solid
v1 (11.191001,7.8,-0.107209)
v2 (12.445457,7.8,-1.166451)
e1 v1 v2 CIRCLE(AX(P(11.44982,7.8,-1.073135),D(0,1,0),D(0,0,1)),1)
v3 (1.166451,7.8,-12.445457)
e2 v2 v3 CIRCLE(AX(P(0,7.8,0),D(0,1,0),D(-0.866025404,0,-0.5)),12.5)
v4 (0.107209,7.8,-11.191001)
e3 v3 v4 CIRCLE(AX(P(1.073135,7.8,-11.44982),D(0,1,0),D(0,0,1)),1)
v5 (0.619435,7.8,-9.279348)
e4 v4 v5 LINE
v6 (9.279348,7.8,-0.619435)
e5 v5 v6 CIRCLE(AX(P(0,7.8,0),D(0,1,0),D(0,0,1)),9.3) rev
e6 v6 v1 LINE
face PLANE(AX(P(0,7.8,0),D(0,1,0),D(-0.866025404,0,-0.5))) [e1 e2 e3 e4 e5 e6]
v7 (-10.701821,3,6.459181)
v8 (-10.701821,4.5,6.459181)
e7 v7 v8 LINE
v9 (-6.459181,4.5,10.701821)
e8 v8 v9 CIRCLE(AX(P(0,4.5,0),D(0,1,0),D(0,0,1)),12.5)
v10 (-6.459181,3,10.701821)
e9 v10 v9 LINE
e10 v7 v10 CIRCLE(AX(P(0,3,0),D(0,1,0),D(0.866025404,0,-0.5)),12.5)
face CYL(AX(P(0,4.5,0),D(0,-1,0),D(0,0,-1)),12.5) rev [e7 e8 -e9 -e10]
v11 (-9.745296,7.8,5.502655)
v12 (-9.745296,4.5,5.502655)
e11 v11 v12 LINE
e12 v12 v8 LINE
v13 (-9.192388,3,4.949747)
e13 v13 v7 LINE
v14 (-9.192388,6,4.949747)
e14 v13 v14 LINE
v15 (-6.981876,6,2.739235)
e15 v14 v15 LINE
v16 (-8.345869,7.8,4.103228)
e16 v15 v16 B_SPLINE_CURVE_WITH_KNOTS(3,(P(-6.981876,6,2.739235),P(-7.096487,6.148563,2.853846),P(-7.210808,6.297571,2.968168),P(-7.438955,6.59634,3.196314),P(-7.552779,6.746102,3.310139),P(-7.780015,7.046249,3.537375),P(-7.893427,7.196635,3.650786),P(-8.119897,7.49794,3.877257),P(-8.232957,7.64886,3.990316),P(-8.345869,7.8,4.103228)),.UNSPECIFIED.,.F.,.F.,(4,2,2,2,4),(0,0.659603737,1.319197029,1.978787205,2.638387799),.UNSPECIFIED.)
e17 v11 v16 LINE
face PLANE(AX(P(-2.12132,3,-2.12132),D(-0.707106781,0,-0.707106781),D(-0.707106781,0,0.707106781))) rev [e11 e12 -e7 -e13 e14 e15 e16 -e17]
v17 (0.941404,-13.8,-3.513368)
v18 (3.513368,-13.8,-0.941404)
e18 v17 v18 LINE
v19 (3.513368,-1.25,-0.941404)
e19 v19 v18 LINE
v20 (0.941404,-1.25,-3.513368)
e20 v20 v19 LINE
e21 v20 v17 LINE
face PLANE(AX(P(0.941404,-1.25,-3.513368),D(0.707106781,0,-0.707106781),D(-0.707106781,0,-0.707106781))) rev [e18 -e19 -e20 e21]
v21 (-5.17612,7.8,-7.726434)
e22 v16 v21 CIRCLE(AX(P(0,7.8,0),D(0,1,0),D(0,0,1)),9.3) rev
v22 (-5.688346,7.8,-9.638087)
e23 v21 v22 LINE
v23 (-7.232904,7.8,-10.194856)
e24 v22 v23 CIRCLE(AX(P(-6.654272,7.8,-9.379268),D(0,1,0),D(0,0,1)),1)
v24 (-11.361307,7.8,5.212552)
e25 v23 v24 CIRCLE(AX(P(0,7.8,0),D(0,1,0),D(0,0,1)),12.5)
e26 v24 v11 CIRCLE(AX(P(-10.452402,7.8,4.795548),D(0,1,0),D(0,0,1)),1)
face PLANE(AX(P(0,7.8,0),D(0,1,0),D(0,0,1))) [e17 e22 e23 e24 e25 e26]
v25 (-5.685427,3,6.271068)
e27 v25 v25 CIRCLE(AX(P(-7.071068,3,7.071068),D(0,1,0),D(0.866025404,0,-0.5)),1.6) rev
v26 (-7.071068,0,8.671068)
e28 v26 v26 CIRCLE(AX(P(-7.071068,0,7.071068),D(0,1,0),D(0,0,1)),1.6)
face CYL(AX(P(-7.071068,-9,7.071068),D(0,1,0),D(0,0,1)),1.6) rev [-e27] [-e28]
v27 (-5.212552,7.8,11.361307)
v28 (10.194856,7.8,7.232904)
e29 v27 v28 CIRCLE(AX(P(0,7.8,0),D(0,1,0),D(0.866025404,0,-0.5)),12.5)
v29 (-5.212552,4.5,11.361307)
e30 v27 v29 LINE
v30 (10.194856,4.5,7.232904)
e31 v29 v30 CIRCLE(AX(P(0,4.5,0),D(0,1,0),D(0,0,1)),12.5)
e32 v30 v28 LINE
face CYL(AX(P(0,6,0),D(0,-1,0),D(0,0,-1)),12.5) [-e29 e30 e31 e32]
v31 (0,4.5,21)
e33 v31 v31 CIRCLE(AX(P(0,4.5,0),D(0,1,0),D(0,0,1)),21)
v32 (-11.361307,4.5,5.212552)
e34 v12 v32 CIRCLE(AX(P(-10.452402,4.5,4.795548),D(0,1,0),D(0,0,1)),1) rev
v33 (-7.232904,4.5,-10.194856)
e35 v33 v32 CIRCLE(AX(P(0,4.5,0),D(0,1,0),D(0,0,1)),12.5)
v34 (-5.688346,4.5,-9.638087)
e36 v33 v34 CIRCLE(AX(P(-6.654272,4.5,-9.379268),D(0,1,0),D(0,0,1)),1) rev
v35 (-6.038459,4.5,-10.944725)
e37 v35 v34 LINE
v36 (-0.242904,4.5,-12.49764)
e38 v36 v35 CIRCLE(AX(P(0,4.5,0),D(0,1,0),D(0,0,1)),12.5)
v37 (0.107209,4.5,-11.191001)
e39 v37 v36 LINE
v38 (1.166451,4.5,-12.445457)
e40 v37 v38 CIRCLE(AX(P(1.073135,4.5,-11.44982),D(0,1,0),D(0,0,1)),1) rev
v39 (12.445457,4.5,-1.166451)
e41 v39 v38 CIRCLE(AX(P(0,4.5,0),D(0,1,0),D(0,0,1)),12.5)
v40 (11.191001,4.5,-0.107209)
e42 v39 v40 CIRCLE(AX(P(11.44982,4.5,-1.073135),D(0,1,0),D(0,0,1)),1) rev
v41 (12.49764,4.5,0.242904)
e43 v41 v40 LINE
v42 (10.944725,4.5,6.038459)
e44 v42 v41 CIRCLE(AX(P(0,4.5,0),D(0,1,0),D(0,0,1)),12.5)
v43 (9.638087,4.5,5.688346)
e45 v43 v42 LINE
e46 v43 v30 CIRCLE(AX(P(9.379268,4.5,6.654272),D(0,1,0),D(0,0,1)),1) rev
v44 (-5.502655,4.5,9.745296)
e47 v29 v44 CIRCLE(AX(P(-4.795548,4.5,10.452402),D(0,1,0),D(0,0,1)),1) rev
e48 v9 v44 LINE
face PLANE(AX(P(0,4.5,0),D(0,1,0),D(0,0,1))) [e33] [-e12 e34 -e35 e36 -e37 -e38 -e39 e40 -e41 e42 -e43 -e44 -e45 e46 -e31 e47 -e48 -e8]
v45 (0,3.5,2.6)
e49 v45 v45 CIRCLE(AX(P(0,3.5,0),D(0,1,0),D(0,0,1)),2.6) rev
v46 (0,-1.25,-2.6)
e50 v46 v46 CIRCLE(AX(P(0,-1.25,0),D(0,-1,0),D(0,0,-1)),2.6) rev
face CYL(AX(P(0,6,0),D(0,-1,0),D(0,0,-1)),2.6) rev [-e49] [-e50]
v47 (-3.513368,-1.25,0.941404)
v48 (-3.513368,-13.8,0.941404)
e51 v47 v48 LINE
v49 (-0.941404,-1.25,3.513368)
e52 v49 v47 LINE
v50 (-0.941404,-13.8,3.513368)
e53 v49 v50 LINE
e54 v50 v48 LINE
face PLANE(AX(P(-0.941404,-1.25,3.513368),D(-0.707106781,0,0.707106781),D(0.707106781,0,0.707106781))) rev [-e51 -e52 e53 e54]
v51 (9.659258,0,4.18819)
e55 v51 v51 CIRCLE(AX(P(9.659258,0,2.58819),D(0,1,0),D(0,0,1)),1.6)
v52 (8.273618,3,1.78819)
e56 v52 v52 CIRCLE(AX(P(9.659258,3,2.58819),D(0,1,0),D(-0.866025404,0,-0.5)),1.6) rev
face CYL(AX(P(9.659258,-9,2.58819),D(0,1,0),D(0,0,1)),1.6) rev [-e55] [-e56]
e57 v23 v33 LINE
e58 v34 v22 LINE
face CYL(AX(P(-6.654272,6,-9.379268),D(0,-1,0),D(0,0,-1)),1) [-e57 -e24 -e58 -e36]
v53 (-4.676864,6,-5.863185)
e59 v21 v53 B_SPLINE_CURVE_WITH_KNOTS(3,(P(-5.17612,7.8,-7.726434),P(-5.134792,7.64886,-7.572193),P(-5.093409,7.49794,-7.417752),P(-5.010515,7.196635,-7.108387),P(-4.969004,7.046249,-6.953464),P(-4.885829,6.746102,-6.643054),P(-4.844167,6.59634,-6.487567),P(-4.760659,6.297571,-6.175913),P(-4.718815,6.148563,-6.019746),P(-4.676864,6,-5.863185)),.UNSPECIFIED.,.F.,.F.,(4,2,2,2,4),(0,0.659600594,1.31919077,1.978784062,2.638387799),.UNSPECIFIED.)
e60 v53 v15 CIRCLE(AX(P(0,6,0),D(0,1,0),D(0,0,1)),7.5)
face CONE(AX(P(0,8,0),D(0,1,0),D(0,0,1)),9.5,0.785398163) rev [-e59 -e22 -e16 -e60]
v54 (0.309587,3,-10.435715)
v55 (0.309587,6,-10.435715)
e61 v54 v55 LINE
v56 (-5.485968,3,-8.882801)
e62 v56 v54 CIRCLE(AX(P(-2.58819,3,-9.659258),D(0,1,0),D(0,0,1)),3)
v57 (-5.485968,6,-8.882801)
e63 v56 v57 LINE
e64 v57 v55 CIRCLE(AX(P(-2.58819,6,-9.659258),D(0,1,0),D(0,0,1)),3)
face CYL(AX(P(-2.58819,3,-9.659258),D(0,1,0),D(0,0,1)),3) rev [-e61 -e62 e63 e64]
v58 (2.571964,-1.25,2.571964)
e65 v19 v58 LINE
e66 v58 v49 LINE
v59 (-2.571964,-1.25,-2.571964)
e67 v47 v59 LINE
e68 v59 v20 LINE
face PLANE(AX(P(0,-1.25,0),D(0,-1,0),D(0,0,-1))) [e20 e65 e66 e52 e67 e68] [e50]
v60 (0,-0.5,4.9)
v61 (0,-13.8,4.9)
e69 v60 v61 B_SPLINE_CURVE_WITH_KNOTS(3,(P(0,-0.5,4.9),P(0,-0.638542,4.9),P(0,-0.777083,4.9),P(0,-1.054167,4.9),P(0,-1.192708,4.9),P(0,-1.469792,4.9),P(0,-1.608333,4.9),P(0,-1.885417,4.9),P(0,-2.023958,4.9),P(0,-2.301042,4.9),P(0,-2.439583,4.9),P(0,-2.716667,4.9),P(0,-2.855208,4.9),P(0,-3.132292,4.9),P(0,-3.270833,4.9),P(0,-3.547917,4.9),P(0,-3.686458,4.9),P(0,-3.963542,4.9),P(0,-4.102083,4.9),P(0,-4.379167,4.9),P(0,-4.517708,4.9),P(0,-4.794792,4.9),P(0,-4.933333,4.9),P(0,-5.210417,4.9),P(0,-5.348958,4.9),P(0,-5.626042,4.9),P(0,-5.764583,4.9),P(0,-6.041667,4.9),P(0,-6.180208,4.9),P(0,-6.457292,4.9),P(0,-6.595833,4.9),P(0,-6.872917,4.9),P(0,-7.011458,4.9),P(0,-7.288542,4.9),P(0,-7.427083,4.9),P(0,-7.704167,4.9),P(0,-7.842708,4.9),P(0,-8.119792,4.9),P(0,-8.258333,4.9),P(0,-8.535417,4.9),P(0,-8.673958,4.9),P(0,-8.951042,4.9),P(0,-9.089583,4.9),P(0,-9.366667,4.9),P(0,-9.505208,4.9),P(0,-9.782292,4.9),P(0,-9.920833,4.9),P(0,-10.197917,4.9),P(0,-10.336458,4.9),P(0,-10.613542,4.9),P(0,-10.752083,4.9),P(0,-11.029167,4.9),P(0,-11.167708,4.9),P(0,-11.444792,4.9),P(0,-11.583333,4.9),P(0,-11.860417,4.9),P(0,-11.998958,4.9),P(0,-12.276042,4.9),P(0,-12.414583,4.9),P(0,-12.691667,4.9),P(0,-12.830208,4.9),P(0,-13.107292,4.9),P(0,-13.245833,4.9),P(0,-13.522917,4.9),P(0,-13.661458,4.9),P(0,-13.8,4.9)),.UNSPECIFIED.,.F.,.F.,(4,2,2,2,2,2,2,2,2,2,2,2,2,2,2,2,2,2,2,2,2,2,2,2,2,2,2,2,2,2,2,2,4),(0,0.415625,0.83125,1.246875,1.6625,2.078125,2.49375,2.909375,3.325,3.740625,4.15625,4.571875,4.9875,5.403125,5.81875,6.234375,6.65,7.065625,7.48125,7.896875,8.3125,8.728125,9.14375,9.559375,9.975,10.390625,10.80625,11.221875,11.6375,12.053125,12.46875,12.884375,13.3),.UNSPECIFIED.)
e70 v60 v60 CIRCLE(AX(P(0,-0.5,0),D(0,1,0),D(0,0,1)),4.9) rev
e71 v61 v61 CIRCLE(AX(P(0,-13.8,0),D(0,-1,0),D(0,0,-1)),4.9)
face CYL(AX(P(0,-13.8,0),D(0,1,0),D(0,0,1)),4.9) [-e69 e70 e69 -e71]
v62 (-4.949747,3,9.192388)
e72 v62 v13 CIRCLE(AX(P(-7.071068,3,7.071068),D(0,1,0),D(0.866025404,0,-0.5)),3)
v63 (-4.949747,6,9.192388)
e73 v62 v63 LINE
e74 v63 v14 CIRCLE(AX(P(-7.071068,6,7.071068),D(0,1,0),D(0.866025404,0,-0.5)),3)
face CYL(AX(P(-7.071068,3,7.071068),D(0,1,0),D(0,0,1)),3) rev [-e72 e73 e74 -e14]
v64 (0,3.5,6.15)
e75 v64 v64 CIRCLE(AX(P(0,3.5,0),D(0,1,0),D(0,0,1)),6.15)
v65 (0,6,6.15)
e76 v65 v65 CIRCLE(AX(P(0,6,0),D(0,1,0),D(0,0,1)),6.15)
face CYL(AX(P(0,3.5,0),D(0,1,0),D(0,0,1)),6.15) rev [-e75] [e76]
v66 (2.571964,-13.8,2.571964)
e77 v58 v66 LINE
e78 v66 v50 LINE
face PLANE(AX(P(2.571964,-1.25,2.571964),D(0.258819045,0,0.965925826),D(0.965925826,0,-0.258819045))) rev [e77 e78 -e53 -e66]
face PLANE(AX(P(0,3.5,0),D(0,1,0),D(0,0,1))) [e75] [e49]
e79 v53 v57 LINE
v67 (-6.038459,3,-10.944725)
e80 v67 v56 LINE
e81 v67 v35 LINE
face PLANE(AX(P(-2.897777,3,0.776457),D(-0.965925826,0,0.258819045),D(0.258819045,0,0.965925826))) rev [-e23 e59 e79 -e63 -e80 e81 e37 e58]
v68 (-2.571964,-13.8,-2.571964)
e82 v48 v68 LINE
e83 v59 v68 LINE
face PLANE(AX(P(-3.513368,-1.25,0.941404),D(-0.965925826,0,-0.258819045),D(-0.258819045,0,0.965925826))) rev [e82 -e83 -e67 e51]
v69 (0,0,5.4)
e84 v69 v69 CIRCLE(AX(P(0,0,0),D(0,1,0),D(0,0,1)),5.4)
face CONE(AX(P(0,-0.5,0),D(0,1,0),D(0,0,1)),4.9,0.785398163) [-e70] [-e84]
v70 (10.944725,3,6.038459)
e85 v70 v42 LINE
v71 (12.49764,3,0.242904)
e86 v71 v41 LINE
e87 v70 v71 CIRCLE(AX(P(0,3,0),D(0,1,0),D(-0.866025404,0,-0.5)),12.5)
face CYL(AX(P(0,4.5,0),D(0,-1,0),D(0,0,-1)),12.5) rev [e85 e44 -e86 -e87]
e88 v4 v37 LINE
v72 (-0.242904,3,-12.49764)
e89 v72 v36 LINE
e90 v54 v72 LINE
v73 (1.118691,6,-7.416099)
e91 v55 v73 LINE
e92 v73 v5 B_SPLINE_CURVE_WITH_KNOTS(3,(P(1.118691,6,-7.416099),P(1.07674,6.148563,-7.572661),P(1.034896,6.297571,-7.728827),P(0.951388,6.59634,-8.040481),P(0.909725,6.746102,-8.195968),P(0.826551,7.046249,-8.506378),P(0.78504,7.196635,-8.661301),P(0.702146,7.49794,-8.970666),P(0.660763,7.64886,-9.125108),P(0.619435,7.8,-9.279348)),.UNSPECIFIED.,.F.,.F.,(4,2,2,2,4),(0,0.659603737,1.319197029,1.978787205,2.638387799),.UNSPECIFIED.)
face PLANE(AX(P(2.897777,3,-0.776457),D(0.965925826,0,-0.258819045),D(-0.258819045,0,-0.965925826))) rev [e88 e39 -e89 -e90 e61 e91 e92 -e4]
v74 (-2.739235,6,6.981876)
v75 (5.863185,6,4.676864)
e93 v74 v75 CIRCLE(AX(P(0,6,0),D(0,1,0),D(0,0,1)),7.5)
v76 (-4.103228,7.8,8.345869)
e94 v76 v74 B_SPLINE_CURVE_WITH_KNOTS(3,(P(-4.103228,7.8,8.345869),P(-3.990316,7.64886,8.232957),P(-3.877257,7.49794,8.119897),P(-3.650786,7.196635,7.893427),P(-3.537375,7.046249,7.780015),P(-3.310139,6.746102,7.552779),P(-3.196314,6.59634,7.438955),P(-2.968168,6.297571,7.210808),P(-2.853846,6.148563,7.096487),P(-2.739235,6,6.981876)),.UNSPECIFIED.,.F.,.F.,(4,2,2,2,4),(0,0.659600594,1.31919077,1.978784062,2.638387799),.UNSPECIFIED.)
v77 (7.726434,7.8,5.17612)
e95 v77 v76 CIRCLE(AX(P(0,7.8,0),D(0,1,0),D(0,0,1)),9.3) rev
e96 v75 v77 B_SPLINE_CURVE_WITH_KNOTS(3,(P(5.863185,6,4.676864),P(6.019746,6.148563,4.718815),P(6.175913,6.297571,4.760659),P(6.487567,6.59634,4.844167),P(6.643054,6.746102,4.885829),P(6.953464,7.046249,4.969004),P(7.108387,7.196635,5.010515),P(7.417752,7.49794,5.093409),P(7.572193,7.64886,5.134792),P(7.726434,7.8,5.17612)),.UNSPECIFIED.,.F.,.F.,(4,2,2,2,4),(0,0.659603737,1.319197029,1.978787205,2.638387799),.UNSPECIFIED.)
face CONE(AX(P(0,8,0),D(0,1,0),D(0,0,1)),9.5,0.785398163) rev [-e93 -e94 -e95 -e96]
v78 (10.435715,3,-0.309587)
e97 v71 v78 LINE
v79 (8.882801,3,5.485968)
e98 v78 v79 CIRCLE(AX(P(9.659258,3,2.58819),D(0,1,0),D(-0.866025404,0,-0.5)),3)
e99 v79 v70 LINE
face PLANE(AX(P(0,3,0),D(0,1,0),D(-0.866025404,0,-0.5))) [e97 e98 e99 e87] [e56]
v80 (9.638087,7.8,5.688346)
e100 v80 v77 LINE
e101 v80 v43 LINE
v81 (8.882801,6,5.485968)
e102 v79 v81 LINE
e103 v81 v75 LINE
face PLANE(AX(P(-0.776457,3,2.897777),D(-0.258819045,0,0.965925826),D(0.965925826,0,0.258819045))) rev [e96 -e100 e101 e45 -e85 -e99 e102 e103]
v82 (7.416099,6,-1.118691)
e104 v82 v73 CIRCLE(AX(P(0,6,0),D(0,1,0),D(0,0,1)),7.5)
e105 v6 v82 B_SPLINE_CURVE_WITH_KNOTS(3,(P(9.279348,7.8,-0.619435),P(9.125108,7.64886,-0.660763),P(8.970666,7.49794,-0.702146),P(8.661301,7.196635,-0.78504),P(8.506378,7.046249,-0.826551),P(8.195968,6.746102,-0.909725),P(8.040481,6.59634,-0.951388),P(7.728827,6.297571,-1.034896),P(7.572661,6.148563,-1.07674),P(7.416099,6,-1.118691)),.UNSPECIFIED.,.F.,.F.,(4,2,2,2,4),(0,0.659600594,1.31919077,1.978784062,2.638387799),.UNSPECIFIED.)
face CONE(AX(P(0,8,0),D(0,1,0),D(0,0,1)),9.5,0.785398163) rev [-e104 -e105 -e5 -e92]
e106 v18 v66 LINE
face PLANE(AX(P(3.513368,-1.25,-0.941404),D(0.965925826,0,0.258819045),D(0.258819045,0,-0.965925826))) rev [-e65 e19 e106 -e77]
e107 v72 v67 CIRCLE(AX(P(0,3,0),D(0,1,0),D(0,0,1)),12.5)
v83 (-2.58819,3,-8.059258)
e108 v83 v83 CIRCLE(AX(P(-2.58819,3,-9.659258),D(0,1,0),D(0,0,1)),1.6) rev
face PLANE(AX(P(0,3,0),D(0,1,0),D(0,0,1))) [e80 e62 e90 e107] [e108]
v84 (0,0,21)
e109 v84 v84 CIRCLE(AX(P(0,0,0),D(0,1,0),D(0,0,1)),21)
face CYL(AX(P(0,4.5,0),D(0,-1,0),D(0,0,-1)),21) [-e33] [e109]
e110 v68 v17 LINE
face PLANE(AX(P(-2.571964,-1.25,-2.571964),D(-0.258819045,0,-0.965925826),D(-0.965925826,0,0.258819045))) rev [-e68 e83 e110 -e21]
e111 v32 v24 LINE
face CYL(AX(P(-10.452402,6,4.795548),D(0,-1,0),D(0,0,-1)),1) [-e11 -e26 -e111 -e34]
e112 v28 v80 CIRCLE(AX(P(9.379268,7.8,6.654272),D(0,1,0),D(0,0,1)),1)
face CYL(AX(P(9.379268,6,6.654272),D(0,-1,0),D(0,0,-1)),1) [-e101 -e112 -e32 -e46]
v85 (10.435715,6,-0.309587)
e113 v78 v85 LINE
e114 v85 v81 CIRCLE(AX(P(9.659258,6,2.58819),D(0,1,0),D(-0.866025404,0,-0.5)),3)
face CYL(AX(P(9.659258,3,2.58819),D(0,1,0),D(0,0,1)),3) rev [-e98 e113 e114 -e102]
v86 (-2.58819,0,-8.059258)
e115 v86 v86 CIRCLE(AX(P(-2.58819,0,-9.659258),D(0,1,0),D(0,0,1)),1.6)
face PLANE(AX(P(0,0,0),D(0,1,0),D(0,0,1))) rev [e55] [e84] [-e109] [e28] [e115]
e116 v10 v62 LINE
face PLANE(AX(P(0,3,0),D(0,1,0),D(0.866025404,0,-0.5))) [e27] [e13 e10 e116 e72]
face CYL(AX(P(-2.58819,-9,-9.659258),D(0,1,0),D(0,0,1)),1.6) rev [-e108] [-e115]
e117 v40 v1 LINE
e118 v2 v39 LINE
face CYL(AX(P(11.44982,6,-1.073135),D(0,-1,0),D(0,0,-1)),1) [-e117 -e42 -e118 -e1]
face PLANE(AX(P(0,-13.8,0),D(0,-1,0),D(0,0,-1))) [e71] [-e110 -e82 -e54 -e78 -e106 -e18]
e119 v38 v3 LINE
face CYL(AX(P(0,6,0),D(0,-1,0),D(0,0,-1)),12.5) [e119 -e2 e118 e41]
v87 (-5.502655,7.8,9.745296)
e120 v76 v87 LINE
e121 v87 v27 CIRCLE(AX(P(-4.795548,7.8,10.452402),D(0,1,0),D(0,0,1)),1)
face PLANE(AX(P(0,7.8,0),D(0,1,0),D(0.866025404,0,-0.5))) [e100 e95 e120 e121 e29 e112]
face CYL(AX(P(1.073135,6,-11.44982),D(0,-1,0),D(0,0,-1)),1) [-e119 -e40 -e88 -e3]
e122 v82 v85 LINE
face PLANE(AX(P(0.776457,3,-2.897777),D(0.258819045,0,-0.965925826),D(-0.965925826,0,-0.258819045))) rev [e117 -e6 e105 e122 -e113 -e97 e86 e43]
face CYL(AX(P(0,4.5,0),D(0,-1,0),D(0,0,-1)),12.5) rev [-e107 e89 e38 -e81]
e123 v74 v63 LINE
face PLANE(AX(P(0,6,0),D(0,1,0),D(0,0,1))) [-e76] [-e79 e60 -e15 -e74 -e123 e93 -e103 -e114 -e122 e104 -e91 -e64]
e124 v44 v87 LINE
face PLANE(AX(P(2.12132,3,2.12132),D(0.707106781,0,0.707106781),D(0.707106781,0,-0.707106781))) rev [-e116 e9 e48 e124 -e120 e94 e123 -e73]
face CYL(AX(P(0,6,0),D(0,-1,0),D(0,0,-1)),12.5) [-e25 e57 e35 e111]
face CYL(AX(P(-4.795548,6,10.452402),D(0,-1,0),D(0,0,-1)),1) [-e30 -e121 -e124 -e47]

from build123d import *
from build123d.topology import SkipClean

# Parameters (mm, degrees)
SKETCH_1_R               = 4
SKETCH_1_R_2             = 2.625
EXTRUDE_1_DEPTH          = 6
SKETCH_2_R               = 12.5
SKETCH_2_R_2             = 2.6
EXTRUDE_2_DEPTH          = 6
SKETCH_3_R               = 1.6
CUT_EXTRUDE_1_DEPTH      = 15
SKETCH_6_R               = 1.6
CUT_EXTRUDE_5_DEPTH      = 3
PATTERN_CIRCULAR_1_COUNT = 3
EXTRUDE_START            = 13.8
SKETCH_4_R               = 4.9
SKETCH_4_R_2             = 2.6
EXTRUDE_3_DEPTH          = 13.8
SKETCH_7_R               = 6.15
CUT_EXTRUDE_7_DEPTH      = 2.5
CUT_EXTRUDE_8_DEPTH      = 12.55
SKETCH_10_R              = 21
SKETCH_10_R_2            = 12.5
EXTRUDE_4_DEPTH          = 4.5
EXTRUDE_5_DEPTH          = 1.8
PATTERN_CIRCULAR_2_COUNT = 3
FILLET_1_R               = 1
CHAMFER_1_SIZE           = 0.5
CHAMFER_2_SIZE           = 2


with BuildPart() as part:
    # 草图1 → 凸台-拉伸1 (new body)
    with BuildSketch(Plane(origin=(0, 0, 0), x_dir=(1, 0, 0), z_dir=(0, 1, 0))):
        with Locations(Location((0, 0, 0), (0, 0, 270))):
            Circle(SKETCH_1_R)
        with Locations(Location((0, 0, 0), (0, 0, 270))):
            Circle(SKETCH_1_R_2, mode=Mode.SUBTRACT)
    extrude(amount=EXTRUDE_1_DEPTH)

    # 草图2 → 凸台-拉伸2 (add)
    with BuildSketch(Plane(origin=(0, 0, 0), x_dir=(-1, 0, 0), z_dir=(0, -1, 0))):
        with Locations(Location((0, 0, 0), (0, 0, 90))):
            Circle(SKETCH_2_R)
        with Locations(Location((0, 0, 0), (0, 0, 90))):
            Circle(SKETCH_2_R_2, mode=Mode.SUBTRACT)
    extrude(amount=-EXTRUDE_2_DEPTH)

    # 草图3 → 切除-拉伸1 (cut)
    with BuildSketch(Plane(origin=(0, 6, 0), x_dir=(1, 0, 0), z_dir=(0, 1, 0))):
        with Locations(Location((-2.588190451, 9.659258263, 0), (0, 0, 270))):
            Circle(SKETCH_3_R)
    cut_extrude_1 = extrude(amount=-CUT_EXTRUDE_1_DEPTH, mode=Mode.SUBTRACT)

    # 草图6 → 切除-拉伸5 (cut)
    with BuildSketch(Plane(origin=(0, 6, 0), x_dir=(1, 0, 0), z_dir=(0, 1, 0))):
        with BuildLine():
            Line((-6.038458877, 10.944725414), (-5.48596793, 8.882801128))
            ThreePointArc((-5.48596793, 8.882801128), (-1.811733316, 6.761480784), (0.309587028, 10.435715398))
            Line((0.309587028, 10.435715398), (-0.24290392, 12.497639685))
            ThreePointArc((-0.24290392, 12.497639685), (-3.235238064, 12.074072829), (-6.038458877, 10.944725414))
        make_face()
        with Locations(Location((-2.588190451, 9.659258263, 0), (0, 0, 270))):
            Circle(SKETCH_6_R, mode=Mode.SUBTRACT)
    cut_extrude_5 = extrude(amount=-CUT_EXTRUDE_5_DEPTH, mode=Mode.SUBTRACT)

    # 阵列(圆周)1: 切除-拉伸1, 切除-拉伸5 ×3 about axis
    pattern_circular_1_axis = Axis((0, 0, 0), (0, 1, 0))
    add([cut_extrude_1.rotate(pattern_circular_1_axis, i * 360 / PATTERN_CIRCULAR_1_COUNT) for i in range(1, PATTERN_CIRCULAR_1_COUNT)], mode=Mode.SUBTRACT)
    add([cut_extrude_5.rotate(pattern_circular_1_axis, i * 360 / PATTERN_CIRCULAR_1_COUNT) for i in range(1, PATTERN_CIRCULAR_1_COUNT)], mode=Mode.SUBTRACT)

    # 草图4 → 凸台-拉伸3 (add)
    with BuildSketch(Plane(origin=(0, 0, 0), x_dir=(-1, 0, 0), z_dir=(0, -1, 0)).offset(EXTRUDE_START)):
        with Locations(Location((0, 0, 0), (0, 0, 270))):
            Circle(SKETCH_4_R)
        with Locations(Location((0, 0, 0), (0, 0, 90))):
            Circle(SKETCH_4_R_2, mode=Mode.SUBTRACT)
    extrude(amount=-EXTRUDE_3_DEPTH)

    # 草图7 → 切除-拉伸7 (cut)
    with BuildSketch(Plane(origin=(0, 6, 0), x_dir=(1, 0, 0), z_dir=(0, 1, 0))):
        with Locations(Location((0, 0, 0), (0, 0, 270))):
            Circle(SKETCH_7_R)
    extrude(amount=-CUT_EXTRUDE_7_DEPTH, mode=Mode.SUBTRACT)

    # 草图8 → 切除-拉伸8 (cut)
    with BuildSketch(Plane(origin=(0, -13.8, 0), x_dir=(-1, 0, 0), z_dir=(0, -1, 0))):
        Polygon((-2.57196423, -2.57196423), (0.941404246, -3.513368476), (3.513368476, -0.941404246), (2.57196423, 2.57196423), (-0.941404246, 3.513368476), (-3.513368476, 0.941404246), align=None)
    extrude(amount=-CUT_EXTRUDE_8_DEPTH, mode=Mode.SUBTRACT)

    # 草图10 → 凸台-拉伸4 (add)
    with BuildSketch(Plane(origin=(0, 0, 0), x_dir=(1, 0, 0), z_dir=(0, 1, 0))):
        with Locations(Location((0, 0, 0), (0, 0, 270))):
            Circle(SKETCH_10_R)
        Circle(SKETCH_10_R_2, mode=Mode.SUBTRACT)
    extrude(amount=EXTRUDE_4_DEPTH)

    # 草图11 → 凸台-拉伸5 (add)
    with BuildSketch(Plane(origin=(0, 6, 0), x_dir=(1, 0, 0), z_dir=(0, 1, 0))):
        with BuildLine():
            Line((-5.230740824, 7.930280602), (-6.038458877, 10.944725414))
            ThreePointArc((-6.038458877, 10.944725414), (-12.074072829, 3.235238064), (-10.701821494, -6.459180807))
            Line((-10.701821494, -6.459180807), (-8.495094736, -4.252454048))
            ThreePointArc((-8.495094736, -4.252454048), (-9.17629535, 2.458780928), (-5.230740824, 7.930280602))
        make_face()
    extrude_5 = extrude(amount=EXTRUDE_5_DEPTH)

    # 阵列(圆周)2: 凸台-拉伸5 ×3 about axis
    with SkipClean():  # the faces are left unmerged after this step: merging them gives an invalid solid
        pattern_circular_2_axis = Axis((0, 3.5, 0), (0, 1, 0))
        for i in range(1, PATTERN_CIRCULAR_2_COUNT):
            add(extrude_5.rotate(pattern_circular_2_axis, i * 360 / PATTERN_CIRCULAR_2_COUNT))

    # 圆角1
    fillet_1_edges = [part.edges().sort_by_distance(p)[0] for p in [
        (-10.701821494, 6.9, 6.459180807),
        (-6.459180807, 6.9, 10.701821494),
        (10.944725414, 6.9, 6.038458877),
        (12.497639685, 6.9, 0.24290392),
        (-0.24290392, 6.9, -12.497639685),
        (-6.038458877, 6.9, -10.944725414),
    ]]
    fillet(fillet_1_edges, radius=FILLET_1_R)

    # 倒角1
    chamfer_1_edges = [part.edges().sort_by_distance(p)[0] for p in [
        (0, 0, -4.9),
    ]]
    chamfer(chamfer_1_edges, length=CHAMFER_1_SIZE)

    # 倒角2
    # the kernel refuses this chamfer: 2 mm, written as the material it adds along each edge
    with BuildSketch(Plane(origin=(0, 6, 0), x_dir=(-0.46364396793112084, 0, -0.8860215973671781), z_dir=(-0.8860215973671781, 0, 0.46364396793112084))) as chamfer_2_piece_1_section:
        Polygon((9.5 - CHAMFER_2_SIZE, 0), (9.5, -CHAMFER_2_SIZE), (9.5, 0), align=None)
    chamfer_2_piece_1 = revolve(axis=Axis((0, 6, 0), (0, -1, 0)), revolution_arc=145.244994466, mode=Mode.PRIVATE)
    chamfer_2_piece_1 = split(chamfer_2_piece_1, bisect_by=Plane(origin=(4.843261848, 6.879467901, -1.80808044), z_dir=(0.2588190451025276, 0, -0.9659258262890666)), keep=Keep.TOP, mode=Mode.PRIVATE)
    chamfer_2_piece_1 = split(chamfer_2_piece_1, bisect_by=Plane(origin=(1.80808044, 6.879467901, -4.843261848), z_dir=(0.9659258262890712, 0, -0.2588190451025102)), keep=Keep.TOP, mode=Mode.PRIVATE)
    chamfer_2_piece_1 = split(chamfer_2_piece_1, bisect_by=Plane(origin=(5.954215348, 7.8, -5.954215348), z_dir=(0, -1, 0)), keep=Keep.TOP, mode=Mode.PRIVATE)
    add(chamfer_2_piece_1)
    with BuildSketch(Plane(origin=(0, 6, 0), x_dir=(0.9991391955872041, 0, 0.04148334414382066), z_dir=(0.04148334414382066, 0, -0.9991391955872041))) as chamfer_2_piece_2_section:
        Polygon((9.5 - CHAMFER_2_SIZE, 0), (9.5, -CHAMFER_2_SIZE), (9.5, 0), align=None)
    chamfer_2_piece_2 = revolve(axis=Axis((0, 6, 0), (0, -1, 0)), revolution_arc=145.244994466, mode=Mode.PRIVATE)
    chamfer_2_piece_2 = split(chamfer_2_piece_2, bisect_by=Plane(origin=(3.290347577, 6.879467901, 3.987474517), z_dir=(-0.25881904510253106, 0, 0.9659258262890655)), keep=Keep.TOP, mode=Mode.PRIVATE)
    chamfer_2_piece_2 = split(chamfer_2_piece_2, bisect_by=Plane(origin=(-0.855787331, 6.879467901, 5.098428018), z_dir=(0.7071067811865428, 0, 0.7071067811865523)), keep=Keep.TOP, mode=Mode.PRIVATE)
    chamfer_2_piece_2 = split(chamfer_2_piece_2, bisect_by=Plane(origin=(2.179394077, 7.8, 8.133609425), z_dir=(0, -1, 0)), keep=Keep.TOP, mode=Mode.PRIVATE)
    add(chamfer_2_piece_2)
    with BuildSketch(Plane(origin=(0, 6, 0), x_dir=(-0.535495227656083, 0, 0.8445382532233574), z_dir=(0.8445382532233574, 0, 0.535495227656083))) as chamfer_2_piece_3_section:
        Polygon((9.5, -CHAMFER_2_SIZE), (9.5 - CHAMFER_2_SIZE, 0), (9.5, 0), align=None)
    chamfer_2_piece_3 = revolve(axis=Axis((0, 6, 0), (0, -1, 0)), revolution_arc=145.244994466, mode=Mode.PRIVATE)
    chamfer_2_piece_3 = split(chamfer_2_piece_3, bisect_by=Plane(origin=(-3.987474517, 6.879467901, -3.290347577), z_dir=(-0.96592582628907, 0, 0.25881904510251447)), keep=Keep.TOP, mode=Mode.PRIVATE)
    chamfer_2_piece_3 = split(chamfer_2_piece_3, bisect_by=Plane(origin=(-5.098428018, 6.879467901, 0.855787331), z_dir=(-0.7071067811865401, 0, -0.7071067811865549)), keep=Keep.TOP, mode=Mode.PRIVATE)
    chamfer_2_piece_3 = split(chamfer_2_piece_3, bisect_by=Plane(origin=(-8.133609425, 7.8, -2.179394077), z_dir=(0, -1, 0)), keep=Keep.TOP, mode=Mode.PRIVATE)
    add(chamfer_2_piece_3)


solid = part.part
